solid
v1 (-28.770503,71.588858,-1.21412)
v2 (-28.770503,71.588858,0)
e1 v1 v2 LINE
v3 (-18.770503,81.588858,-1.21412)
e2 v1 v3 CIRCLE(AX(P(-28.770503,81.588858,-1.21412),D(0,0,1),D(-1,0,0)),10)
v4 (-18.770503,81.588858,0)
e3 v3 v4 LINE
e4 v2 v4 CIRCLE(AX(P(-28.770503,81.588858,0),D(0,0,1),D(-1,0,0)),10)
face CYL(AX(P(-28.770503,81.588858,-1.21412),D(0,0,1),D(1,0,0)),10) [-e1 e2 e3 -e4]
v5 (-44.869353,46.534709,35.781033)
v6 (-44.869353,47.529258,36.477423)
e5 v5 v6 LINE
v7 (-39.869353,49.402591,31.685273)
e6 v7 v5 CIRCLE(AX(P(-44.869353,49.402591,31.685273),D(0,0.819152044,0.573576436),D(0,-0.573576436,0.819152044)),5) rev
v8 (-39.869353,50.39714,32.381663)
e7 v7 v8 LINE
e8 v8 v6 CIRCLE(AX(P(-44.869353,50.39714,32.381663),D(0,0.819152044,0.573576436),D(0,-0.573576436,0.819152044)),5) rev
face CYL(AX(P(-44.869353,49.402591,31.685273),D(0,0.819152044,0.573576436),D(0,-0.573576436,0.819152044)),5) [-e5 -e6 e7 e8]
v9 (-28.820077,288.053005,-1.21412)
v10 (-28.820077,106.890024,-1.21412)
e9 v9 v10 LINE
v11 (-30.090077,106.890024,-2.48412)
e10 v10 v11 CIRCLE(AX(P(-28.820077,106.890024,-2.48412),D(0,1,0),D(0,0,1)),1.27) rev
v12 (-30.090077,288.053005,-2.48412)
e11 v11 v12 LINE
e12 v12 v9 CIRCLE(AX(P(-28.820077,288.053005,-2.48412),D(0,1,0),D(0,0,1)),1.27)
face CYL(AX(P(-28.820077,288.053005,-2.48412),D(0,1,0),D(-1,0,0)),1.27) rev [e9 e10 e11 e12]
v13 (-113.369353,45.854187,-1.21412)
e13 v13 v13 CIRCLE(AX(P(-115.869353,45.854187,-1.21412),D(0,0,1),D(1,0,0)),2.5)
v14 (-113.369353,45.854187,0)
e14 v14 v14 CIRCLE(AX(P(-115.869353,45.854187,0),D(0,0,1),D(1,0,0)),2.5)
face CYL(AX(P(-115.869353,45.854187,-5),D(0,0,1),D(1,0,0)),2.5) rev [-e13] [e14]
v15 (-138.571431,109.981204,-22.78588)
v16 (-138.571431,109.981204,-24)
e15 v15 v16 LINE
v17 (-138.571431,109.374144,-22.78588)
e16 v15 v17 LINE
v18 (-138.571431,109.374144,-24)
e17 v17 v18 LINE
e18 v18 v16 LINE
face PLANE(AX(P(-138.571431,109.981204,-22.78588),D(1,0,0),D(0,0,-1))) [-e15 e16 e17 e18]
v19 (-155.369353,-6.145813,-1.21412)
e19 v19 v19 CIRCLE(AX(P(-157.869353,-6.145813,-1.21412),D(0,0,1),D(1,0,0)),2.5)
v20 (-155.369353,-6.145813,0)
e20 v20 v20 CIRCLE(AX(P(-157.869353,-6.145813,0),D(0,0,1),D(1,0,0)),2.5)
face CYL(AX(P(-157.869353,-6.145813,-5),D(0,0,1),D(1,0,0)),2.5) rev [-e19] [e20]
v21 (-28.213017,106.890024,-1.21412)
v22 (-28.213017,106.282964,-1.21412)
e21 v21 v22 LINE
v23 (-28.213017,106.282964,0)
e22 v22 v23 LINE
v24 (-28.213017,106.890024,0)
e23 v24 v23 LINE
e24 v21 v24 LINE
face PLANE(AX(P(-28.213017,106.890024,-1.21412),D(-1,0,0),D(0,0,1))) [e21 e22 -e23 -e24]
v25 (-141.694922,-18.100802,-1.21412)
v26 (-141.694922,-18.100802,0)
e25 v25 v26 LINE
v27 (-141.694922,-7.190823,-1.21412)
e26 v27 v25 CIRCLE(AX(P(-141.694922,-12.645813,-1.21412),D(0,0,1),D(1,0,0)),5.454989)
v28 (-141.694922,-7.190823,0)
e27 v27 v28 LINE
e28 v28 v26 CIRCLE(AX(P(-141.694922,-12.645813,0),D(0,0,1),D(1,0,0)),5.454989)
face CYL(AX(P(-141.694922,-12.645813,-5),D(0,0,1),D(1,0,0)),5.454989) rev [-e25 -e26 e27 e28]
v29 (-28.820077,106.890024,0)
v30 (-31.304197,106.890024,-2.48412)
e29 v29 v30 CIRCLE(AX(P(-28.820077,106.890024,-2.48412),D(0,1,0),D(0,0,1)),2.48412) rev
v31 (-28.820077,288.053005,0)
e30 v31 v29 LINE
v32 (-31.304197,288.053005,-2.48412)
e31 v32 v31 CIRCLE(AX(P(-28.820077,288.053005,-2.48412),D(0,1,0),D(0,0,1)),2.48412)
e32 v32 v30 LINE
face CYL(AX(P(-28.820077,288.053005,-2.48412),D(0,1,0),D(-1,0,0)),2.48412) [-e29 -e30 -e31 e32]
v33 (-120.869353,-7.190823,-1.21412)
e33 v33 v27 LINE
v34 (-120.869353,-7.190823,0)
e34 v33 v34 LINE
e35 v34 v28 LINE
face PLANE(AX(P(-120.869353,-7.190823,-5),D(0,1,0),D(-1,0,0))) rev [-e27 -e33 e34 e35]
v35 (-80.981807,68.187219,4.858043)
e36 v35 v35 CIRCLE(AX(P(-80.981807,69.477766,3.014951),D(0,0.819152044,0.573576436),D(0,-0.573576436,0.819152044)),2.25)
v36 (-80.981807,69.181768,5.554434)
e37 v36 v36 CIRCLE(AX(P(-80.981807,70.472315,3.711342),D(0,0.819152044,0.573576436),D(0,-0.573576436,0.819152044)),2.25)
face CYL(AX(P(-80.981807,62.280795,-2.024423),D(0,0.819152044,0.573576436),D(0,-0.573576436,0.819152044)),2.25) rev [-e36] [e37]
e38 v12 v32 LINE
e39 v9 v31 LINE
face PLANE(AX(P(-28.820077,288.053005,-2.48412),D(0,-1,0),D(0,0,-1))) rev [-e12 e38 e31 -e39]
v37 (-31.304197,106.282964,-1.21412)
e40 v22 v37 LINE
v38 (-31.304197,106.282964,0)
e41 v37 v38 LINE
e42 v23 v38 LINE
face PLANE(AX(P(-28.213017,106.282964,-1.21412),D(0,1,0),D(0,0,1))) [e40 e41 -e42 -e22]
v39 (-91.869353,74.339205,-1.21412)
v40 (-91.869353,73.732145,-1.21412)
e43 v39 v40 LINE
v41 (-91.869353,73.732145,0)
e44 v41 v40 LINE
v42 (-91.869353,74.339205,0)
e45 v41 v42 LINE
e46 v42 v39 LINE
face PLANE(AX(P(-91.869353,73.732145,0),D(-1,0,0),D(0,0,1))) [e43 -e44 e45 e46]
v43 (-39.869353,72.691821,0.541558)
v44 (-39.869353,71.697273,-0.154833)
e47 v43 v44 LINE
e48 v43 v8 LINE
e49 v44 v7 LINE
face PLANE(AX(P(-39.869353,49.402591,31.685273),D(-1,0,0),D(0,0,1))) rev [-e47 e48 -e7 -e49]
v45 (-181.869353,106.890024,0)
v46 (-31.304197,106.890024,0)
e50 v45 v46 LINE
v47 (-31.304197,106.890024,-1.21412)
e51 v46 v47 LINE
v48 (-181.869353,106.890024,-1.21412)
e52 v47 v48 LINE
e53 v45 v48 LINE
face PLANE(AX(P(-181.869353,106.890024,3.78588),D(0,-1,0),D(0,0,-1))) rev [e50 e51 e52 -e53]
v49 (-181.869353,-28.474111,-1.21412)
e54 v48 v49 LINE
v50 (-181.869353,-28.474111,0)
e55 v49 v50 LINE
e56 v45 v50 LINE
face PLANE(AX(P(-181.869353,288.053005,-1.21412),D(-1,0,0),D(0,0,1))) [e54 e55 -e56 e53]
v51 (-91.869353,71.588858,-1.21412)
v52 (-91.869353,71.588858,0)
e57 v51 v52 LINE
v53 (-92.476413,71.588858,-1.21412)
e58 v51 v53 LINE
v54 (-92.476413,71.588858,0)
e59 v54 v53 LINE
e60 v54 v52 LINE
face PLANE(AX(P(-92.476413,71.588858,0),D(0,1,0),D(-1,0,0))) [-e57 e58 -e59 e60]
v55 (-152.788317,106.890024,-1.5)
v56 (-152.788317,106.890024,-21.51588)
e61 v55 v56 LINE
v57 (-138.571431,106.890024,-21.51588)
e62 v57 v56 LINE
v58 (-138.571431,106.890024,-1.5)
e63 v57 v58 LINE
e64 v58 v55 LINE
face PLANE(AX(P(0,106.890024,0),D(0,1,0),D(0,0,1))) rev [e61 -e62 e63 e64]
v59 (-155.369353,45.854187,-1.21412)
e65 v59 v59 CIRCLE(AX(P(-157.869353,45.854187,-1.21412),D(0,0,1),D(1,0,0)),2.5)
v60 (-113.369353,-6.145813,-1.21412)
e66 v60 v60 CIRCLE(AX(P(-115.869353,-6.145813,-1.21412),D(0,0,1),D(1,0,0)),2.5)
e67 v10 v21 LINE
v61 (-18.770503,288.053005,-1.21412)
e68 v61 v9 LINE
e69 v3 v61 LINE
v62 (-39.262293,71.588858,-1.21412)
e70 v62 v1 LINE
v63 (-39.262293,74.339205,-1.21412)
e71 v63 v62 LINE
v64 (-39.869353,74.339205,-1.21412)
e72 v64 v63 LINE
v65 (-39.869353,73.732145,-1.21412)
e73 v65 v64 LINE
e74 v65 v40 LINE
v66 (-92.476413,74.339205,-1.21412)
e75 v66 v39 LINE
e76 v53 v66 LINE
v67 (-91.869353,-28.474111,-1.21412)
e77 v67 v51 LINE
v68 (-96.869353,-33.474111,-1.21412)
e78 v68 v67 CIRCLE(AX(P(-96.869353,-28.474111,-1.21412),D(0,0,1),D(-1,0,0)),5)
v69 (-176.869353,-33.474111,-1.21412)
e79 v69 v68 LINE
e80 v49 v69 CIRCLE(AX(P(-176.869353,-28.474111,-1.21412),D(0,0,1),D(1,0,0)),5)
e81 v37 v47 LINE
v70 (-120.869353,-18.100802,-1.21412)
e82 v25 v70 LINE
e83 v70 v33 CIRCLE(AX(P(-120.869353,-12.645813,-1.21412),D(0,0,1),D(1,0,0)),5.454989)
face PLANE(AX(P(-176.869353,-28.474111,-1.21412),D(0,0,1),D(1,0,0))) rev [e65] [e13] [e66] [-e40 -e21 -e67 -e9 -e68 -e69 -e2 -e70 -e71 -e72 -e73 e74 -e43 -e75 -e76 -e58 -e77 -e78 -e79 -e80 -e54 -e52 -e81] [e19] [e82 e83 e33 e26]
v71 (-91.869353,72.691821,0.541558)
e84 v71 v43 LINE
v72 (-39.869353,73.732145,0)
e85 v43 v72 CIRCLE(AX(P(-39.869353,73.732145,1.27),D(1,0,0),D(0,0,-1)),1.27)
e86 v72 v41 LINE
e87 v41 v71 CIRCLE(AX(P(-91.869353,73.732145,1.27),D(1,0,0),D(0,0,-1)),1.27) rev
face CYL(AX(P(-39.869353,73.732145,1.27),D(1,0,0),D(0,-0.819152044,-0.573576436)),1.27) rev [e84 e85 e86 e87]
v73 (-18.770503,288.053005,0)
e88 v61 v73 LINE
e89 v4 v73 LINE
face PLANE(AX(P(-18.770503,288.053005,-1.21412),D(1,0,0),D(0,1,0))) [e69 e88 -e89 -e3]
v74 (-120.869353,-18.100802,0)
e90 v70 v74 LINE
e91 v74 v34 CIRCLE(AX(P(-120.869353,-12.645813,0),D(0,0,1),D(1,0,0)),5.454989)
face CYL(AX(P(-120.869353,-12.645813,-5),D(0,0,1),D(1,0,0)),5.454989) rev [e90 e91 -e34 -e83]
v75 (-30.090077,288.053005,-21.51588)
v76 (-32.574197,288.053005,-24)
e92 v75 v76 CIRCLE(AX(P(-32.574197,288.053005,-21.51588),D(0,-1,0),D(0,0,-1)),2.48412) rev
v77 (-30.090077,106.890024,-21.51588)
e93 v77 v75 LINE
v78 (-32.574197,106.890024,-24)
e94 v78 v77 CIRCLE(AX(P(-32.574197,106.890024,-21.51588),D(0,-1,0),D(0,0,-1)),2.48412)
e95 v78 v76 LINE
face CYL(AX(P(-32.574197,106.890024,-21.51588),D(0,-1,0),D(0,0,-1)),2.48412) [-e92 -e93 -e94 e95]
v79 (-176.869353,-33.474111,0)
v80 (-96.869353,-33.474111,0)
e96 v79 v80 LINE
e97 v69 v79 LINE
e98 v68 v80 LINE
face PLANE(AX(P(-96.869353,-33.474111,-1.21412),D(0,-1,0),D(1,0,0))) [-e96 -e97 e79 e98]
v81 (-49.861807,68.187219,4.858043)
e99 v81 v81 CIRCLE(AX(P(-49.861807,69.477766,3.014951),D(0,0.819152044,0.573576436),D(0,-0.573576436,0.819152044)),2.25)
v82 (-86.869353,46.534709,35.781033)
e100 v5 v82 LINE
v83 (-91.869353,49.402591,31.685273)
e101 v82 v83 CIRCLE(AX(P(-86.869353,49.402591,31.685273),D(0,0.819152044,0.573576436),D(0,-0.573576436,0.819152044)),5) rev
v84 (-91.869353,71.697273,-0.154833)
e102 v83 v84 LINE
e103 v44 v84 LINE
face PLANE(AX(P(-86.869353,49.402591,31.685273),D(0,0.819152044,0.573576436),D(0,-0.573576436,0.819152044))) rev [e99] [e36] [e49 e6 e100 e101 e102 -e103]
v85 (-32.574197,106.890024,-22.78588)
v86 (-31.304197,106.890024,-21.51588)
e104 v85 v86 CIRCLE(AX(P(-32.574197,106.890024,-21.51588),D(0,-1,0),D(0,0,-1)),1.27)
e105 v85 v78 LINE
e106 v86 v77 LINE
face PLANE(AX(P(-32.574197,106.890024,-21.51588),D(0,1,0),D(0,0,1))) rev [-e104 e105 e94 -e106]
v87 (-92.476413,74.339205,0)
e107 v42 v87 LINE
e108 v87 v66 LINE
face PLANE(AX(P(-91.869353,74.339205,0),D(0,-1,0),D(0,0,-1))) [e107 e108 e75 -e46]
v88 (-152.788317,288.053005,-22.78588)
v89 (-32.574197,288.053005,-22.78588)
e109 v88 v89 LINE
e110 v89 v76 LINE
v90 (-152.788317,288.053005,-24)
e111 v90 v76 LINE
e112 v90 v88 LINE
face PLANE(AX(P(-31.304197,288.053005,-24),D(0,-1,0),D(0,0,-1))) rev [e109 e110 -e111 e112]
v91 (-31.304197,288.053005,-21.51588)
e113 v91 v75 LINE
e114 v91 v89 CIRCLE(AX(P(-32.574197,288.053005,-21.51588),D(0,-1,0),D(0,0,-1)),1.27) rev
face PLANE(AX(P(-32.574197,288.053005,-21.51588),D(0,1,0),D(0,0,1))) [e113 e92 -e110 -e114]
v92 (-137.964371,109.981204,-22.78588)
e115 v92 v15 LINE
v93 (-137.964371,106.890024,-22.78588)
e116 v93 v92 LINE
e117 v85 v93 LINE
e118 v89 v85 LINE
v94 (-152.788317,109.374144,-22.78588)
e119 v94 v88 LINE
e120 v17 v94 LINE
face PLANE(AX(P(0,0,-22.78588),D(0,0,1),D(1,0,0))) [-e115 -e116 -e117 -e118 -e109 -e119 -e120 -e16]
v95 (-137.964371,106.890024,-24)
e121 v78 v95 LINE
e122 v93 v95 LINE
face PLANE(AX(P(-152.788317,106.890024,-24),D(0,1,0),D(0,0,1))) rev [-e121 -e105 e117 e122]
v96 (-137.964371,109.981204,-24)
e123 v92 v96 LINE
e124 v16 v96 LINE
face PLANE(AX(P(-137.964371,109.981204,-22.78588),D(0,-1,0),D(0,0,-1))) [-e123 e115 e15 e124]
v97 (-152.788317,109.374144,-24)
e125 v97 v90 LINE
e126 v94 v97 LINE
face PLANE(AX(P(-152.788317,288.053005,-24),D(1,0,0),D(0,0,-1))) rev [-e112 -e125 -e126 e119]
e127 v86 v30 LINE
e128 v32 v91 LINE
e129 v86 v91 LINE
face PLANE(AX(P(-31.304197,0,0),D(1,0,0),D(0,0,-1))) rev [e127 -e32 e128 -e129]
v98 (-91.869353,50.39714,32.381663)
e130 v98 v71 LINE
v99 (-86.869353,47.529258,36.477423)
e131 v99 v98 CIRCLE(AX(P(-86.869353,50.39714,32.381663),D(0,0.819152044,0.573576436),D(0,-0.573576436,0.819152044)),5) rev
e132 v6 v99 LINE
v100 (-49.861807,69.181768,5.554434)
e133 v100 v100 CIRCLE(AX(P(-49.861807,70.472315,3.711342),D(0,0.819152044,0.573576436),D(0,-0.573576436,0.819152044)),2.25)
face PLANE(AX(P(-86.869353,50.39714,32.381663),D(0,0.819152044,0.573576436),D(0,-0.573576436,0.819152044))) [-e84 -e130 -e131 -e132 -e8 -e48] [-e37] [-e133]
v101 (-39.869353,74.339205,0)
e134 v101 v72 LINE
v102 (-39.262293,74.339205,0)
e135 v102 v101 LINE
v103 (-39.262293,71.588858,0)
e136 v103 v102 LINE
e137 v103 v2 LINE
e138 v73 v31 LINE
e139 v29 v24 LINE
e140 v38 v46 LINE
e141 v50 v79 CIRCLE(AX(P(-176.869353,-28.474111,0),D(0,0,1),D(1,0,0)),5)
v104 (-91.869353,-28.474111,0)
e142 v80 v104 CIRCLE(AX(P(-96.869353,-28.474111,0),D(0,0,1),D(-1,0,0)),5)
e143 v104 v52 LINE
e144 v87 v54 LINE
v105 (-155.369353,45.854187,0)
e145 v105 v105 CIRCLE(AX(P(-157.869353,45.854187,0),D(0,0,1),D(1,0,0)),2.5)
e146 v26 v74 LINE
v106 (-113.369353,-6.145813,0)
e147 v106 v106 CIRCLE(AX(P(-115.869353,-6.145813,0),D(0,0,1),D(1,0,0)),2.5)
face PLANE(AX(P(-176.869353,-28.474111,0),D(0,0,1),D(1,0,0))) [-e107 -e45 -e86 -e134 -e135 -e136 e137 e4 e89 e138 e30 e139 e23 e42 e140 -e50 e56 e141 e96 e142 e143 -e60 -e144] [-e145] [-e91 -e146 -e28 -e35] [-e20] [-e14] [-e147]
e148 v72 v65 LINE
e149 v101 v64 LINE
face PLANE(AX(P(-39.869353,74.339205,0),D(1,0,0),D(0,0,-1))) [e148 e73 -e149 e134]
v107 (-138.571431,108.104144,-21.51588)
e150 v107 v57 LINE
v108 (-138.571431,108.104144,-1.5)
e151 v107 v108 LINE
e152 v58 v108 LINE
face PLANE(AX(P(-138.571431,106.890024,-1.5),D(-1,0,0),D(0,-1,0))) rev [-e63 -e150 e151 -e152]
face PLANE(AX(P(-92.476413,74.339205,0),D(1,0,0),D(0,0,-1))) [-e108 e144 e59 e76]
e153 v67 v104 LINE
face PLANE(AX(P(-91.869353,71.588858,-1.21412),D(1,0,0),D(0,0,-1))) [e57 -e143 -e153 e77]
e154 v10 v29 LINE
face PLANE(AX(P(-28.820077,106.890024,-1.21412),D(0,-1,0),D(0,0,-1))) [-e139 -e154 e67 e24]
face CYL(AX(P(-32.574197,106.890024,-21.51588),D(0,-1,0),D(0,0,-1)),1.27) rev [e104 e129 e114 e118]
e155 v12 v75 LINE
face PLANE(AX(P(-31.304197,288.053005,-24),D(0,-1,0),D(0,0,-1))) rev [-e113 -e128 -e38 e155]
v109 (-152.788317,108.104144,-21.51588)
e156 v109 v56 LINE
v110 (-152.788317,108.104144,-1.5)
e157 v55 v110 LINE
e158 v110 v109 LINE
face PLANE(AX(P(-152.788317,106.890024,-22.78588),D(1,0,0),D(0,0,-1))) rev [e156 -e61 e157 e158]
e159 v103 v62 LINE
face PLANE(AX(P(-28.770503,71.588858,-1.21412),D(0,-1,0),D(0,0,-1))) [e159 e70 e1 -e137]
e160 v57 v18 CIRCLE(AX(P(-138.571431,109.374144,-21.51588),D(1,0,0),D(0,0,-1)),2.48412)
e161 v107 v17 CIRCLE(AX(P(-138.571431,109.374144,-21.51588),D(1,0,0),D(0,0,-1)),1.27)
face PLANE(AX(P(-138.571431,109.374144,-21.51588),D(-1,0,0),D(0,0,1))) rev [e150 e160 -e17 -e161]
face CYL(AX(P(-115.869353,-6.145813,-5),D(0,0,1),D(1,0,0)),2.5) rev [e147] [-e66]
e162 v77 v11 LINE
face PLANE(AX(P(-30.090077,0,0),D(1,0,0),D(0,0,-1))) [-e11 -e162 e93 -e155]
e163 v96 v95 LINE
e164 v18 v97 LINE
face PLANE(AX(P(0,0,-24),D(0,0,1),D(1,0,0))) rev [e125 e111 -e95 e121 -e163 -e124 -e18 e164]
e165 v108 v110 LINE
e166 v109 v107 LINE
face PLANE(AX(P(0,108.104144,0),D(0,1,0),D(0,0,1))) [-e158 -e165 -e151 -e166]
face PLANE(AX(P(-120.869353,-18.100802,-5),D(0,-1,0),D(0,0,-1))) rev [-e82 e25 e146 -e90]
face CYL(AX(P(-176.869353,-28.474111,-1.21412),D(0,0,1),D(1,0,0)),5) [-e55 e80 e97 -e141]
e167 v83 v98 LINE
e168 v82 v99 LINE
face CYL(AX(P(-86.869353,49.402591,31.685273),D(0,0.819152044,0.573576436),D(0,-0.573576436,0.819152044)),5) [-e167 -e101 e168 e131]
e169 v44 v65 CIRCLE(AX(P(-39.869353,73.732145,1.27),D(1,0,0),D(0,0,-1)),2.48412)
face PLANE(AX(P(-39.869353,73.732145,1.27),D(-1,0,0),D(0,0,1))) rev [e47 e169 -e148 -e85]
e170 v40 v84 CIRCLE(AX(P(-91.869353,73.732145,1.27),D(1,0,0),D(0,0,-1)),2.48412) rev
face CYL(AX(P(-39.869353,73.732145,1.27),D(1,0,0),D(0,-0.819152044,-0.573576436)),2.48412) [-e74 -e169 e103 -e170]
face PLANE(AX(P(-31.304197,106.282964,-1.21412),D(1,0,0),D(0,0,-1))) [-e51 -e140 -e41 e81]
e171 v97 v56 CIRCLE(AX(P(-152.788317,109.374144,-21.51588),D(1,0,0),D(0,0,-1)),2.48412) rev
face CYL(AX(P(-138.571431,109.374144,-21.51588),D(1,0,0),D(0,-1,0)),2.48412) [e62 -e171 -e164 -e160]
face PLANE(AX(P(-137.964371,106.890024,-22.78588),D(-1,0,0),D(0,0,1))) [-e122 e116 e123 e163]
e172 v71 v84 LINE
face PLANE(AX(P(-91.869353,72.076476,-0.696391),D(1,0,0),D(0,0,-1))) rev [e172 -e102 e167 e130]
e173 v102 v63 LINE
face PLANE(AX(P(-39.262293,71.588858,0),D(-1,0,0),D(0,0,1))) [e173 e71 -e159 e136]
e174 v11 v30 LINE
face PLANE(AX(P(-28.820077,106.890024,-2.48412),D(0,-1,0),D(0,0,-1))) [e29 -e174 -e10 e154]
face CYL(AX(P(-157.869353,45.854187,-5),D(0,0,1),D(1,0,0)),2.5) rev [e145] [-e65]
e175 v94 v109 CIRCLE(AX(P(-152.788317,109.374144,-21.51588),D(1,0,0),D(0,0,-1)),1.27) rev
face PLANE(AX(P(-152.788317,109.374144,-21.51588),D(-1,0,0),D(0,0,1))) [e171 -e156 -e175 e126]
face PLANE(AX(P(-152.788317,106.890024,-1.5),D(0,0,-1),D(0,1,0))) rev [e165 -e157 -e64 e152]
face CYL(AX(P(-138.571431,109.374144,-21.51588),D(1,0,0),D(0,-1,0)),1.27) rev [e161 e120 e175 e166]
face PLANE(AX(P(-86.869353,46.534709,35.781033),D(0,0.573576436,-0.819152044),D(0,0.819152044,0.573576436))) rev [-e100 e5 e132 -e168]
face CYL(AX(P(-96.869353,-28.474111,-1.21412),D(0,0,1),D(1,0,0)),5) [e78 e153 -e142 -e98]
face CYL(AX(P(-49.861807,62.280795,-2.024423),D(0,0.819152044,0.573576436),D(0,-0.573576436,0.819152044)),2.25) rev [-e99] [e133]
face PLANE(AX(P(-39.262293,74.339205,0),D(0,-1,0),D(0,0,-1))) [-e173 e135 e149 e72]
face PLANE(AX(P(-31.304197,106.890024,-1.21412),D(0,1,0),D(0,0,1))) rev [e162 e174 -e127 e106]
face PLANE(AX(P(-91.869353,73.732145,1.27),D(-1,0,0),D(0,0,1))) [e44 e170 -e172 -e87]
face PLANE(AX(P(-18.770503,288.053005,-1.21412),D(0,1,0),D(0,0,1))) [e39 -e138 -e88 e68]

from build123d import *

# Parameters (mm, degrees)
BASE_FLANGE1_DEPTH            = 1.21412
SKETCH19_W                    = 150.565156201
SKETCH19_H                    = 181.162980563
CUT_EXTRUDE2_DEPTH            = 5
EDGE_FLANGE5_START            = 106.282964216
EDGE_FLANGE5_DEPTH            = 181.770040563
EDGE_FLANGE5_2_DEPTH          = 0.60706
EDGE_FLANGE5_START_2          = 106.890024216
EDGE_FLANGE5_3_DEPTH          = 181.162980563
EDGE_FLANGE6_STRIP_W          = 7.39648
EDGE_FLANGE6_STRIP_H          = 1.21412
EDGE_FLANGE6_STRIP_CUT_DEPTH  = 181.162980563
EDGE_FLANGE6_DEPTH            = 181.162980563
EDGE_FLANGE7_STRIP_W          = 7.39648
EDGE_FLANGE7_STRIP_H          = 1.21412
EDGE_FLANGE7_STRIP_CUT_DEPTH  = 14.216886025
EDGE_FLANGE7_RELIEF_W         = 8.00354
EDGE_FLANGE7_RELIEF_H         = 0.60706
EDGE_FLANGE7_RELIEF_CUT_DEPTH = 1.21412
EDGE_FLANGE7_DEPTH            = 14.216886025
SKETCH29_R                    = 2.5
CUT_EXTRUDE3_DEPTH            = 5
EDGE_FLANGE8_START            = -92.476413081
EDGE_FLANGE8_DEPTH            = 53.21412
EDGE_FLANGE8_2_DEPTH          = 0.60706
EDGE_FLANGE8_START_2          = -39.869353081
EDGE_FLANGE8_3_DEPTH          = 0.60706
EDGE_FLANGE8_START_3          = -91.869353081
EDGE_FLANGE8_4_DEPTH          = 52
EDGE_FLANGE8_START_4          = 58
EDGE_FLANGE8_5_DEPTH          = 2.895111402
SKETCH34_R                    = 2.25
CUT_EXTRUDE6_DEPTH            = 10


with BuildPart() as part:
    # Base-Flange1: sheet metal written as solids
    # Sketch1 → Base-Flange1 (new body)
    with BuildSketch(Plane.XY):
        with BuildLine():
            Line((-96.869353081, -33.474110531), (-176.869353081, -33.474110531))
            ThreePointArc((-176.869353081, -33.474110531), (-180.404886987, -32.009644437), (-181.869353081, -28.474110531))
            Line((-181.869353081, -28.474110531), (-181.869353081, 288.053004779))
            Line((-181.869353081, 288.053004779), (-18.770502539, 288.053004779))
            Line((-18.770502539, 288.053004779), (-18.770502539, 81.588857582))
            ThreePointArc((-18.770502539, 81.588857582), (-21.699434728, 74.51778977), (-28.770502539, 71.588857582))
            Line((-28.770502539, 71.588857582), (-91.869353081, 71.588857582))
            Line((-91.869353081, 71.588857582), (-91.869353081, -28.474110531))
            ThreePointArc((-91.869353081, -28.474110531), (-93.333819175, -32.009644437), (-96.869353081, -33.474110531))
        make_face()
    extrude(amount=-BASE_FLANGE1_DEPTH)

    # Sketch19 → Cut-Extrude2 (cut)
    with BuildSketch(Plane(origin=(0, 0, -1.21412), x_dir=(-1, 0, 0), z_dir=(0, 0, -1))):
        with Locations((106.586774981, 197.471514497)):
            Rectangle(SKETCH19_W, SKETCH19_H)
    extrude(amount=-CUT_EXTRUDE2_DEPTH, mode=Mode.SUBTRACT)

    # Edge-Flange5: read off the stored shape, not the designer's step
    # Edge-Flange5 outline → Edge-Flange5 (cut)
    with BuildSketch(Plane(origin=(0, 0, 0), x_dir=(1, 0, 0), z_dir=(0, 1, 0)).offset(EDGE_FLANGE5_START)):
        with BuildLine():
            Line((-31.30419688, 0), (-28.82007688, 0))
            ThreePointArc((-28.82007688, 0), (-30.04808742, 0.324758454), (-30.955012985, 1.21412))
            Line((-30.955012985, 1.21412), (-31.30419688, 1.21412))
            Line((-31.30419688, 1.21412), (-31.30419688, 0))
        make_face()
    extrude(amount=EDGE_FLANGE5_DEPTH, mode=Mode.SUBTRACT)

    # Edge-Flange5 2 outline → Edge-Flange5 2 (cut)
    with BuildSketch(Plane(origin=(0, 0, 0), x_dir=(1, 0, 0), z_dir=(0, 1, 0)).offset(EDGE_FLANGE5_START)):
        with BuildLine():
            Line((-28.21301688, 0), (-28.21301688, 1.21412))
            Line((-28.21301688, 1.21412), (-30.955012985, 1.21412))
            ThreePointArc((-30.955012985, 1.21412), (-30.04808742, 0.324758454), (-28.82007688, 0))
            Line((-28.82007688, 0), (-28.21301688, 0))
        make_face()
    extrude(amount=EDGE_FLANGE5_2_DEPTH, mode=Mode.SUBTRACT)

    # Edge-Flange5 3 outline → Edge-Flange5 3 (add)
    with BuildSketch(Plane(origin=(0, 0, 0), x_dir=(1, 0, 0), z_dir=(0, 1, 0)).offset(EDGE_FLANGE5_START_2)):
        with BuildLine():
            Line((-30.955012985, 1.21412), (-28.82007688, 1.21412))
            ThreePointArc((-28.82007688, 1.21412), (-29.718102492, 1.586094388), (-30.09007688, 2.48412))
            Line((-30.09007688, 2.48412), (-30.09007688, 24))
            Line((-30.09007688, 24), (-31.30419688, 24))
            Line((-31.30419688, 24), (-31.30419688, 2.48412))
            ThreePointArc((-31.30419688, 2.48412), (-31.215310653, 1.825555388), (-30.955012985, 1.21412))
        make_face()
    extrude(amount=EDGE_FLANGE5_3_DEPTH)

    # Edge-Flange6: sheet metal written as solids
    # Edge-Flange6 strip (on a plane across the edge) → Edge-Flange6 strip cut (cut)
    with BuildSketch(Plane(origin=(-31.30419688, 288.053004779, -24), x_dir=(0, 0, 1), z_dir=(0, -1, 0))):
        with Locations((-1.21412, -0.60706)):
            Rectangle(EDGE_FLANGE6_STRIP_W, EDGE_FLANGE6_STRIP_H)
    extrude(amount=EDGE_FLANGE6_STRIP_CUT_DEPTH, mode=Mode.SUBTRACT)

    # Edge-Flange6 section (on a plane across the edge) → Edge-Flange6 (add)
    with BuildSketch(Plane(origin=(-31.30419688, 288.053004779, -24), x_dir=(0, 0, 1), z_dir=(0, -1, 0))):
        with BuildLine():
            Line((0, 1.27), (0, 121.48412))
            Line((0, 121.48412), (1.21412, 121.48412))
            Line((1.21412, 121.48412), (1.21412, 1.27))
            ThreePointArc((1.21412, 1.27), (1.586094388, 0.371974388), (2.48412, 0))
            Line((2.48412, 0), (2.48412, -1.21412))
            ThreePointArc((2.48412, -1.21412), (0.727581903, -0.486538097), (0, 1.27))
        make_face()
    extrude(amount=EDGE_FLANGE6_DEPTH)

    # Edge-Flange7: sheet metal written as solids
    # Edge-Flange7 strip (on a plane across the edge) → Edge-Flange7 strip cut (cut)
    with BuildSketch(Plane(origin=(-152.78831688, 106.890024216, -22.78588), x_dir=(0, 1, 0), z_dir=(1, 0, 0))):
        with Locations((-1.21412, -0.60706)):
            Rectangle(EDGE_FLANGE7_STRIP_W, EDGE_FLANGE7_STRIP_H)
    extrude(amount=EDGE_FLANGE7_STRIP_CUT_DEPTH, mode=Mode.SUBTRACT)

    # Edge-Flange7 relief (on the sheet) → Edge-Flange7 relief cut (cut)
    with BuildSketch(Plane(origin=(-152.78831688, 109.374144216, -22.78588), x_dir=(0, 1, 0), z_dir=(0, 0, 1))):
        with Locations((-3.39471, -14.520416025)):
            Rectangle(EDGE_FLANGE7_RELIEF_W, EDGE_FLANGE7_RELIEF_H)
    extrude(amount=-EDGE_FLANGE7_RELIEF_CUT_DEPTH, mode=Mode.SUBTRACT)

    # Edge-Flange7 section (on a plane across the edge) → Edge-Flange7 (add)
    with BuildSketch(Plane(origin=(-152.78831688, 106.890024216, -22.78588), x_dir=(0, 1, 0), z_dir=(1, 0, 0))):
        with BuildLine():
            Line((0, 1.27), (0, 21.28588))
            Line((0, 21.28588), (1.21412, 21.28588))
            Line((1.21412, 21.28588), (1.21412, 1.27))
            ThreePointArc((1.21412, 1.27), (1.586094388, 0.371974388), (2.48412, 0))
            Line((2.48412, 0), (2.48412, -1.21412))
            ThreePointArc((2.48412, -1.21412), (0.727581903, -0.486538097), (0, 1.27))
        make_face()
    extrude(amount=EDGE_FLANGE7_DEPTH)

    # Sketch29 → Cut-Extrude3 (cut)
    with BuildSketch(Plane.XY):
        with Locations((-157.869353081, 45.8541873)):
            Circle(SKETCH29_R)
        with Locations((-115.869353081, 45.8541873)):
            Circle(SKETCH29_R)
        with Locations((-157.869353081, -6.1458127)):
            Circle(SKETCH29_R)
        with Locations((-115.869353081, -6.1458127)):
            Circle(SKETCH29_R)
        with BuildLine():
            Line((-120.869353081, -18.100802087), (-141.694922457, -18.100802087))
            ThreePointArc((-141.694922457, -18.100802087), (-147.149911844, -12.6458127), (-141.694922457, -7.190823313))
            Line((-141.694922457, -7.190823313), (-120.869353081, -7.190823313))
            ThreePointArc((-120.869353081, -7.190823313), (-115.414363694, -12.6458127), (-120.869353081, -18.100802087))
        make_face()
    extrude(amount=-CUT_EXTRUDE3_DEPTH, mode=Mode.SUBTRACT)

    # Edge-Flange8: read off the stored shape, not the designer's step
    # Edge-Flange8 outline → Edge-Flange8 (cut)
    with BuildSketch(Plane.YZ.offset(EDGE_FLANGE8_START)):
        with BuildLine():
            Line((71.588857582, -1.21412), (73.732144579, -1.21412))
            ThreePointArc((73.732144579, -1.21412), (72.585105614, -0.933441351), (71.697272603, -0.154832697))
            Line((71.697272603, -0.154832697), (71.588857582, 0))
            Line((71.588857582, 0), (71.588857582, -1.21412))
        make_face()
    extrude(amount=EDGE_FLANGE8_DEPTH, mode=Mode.SUBTRACT)

    # Edge-Flange8 2 outline → Edge-Flange8 2 (cut)
    with BuildSketch(Plane.YZ.offset(EDGE_FLANGE8_START)):
        with BuildLine():
            Line((74.339204579, -1.21412), (74.339204579, 0))
            Line((74.339204579, 0), (71.588857582, 0))
            Line((71.588857582, 0), (71.697272603, -0.154832697))
            ThreePointArc((71.697272603, -0.154832697), (72.585105614, -0.933441351), (73.732144579, -1.21412))
            Line((73.732144579, -1.21412), (74.339204579, -1.21412))
        make_face()
    extrude(amount=EDGE_FLANGE8_2_DEPTH, mode=Mode.SUBTRACT)

    # Edge-Flange8 3 outline → Edge-Flange8 3 (cut)
    with BuildSketch(Plane.YZ.offset(EDGE_FLANGE8_START_2)):
        with BuildLine():
            Line((74.339204579, -1.21412), (74.339204579, 0))
            Line((74.339204579, 0), (71.588857582, 0))
            Line((71.588857582, 0), (71.697272603, -0.154832697))
            ThreePointArc((71.697272603, -0.154832697), (72.585105614, -0.933441351), (73.732144579, -1.21412))
            Line((73.732144579, -1.21412), (74.339204579, -1.21412))
        make_face()
    extrude(amount=EDGE_FLANGE8_3_DEPTH, mode=Mode.SUBTRACT)

    # Edge-Flange8 4 outline → Edge-Flange8 4 (add)
    with BuildSketch(Plane.YZ.offset(EDGE_FLANGE8_START_3)):
        with BuildLine():
            Line((71.588857582, 0), (73.732144579, 0))
            ThreePointArc((73.732144579, 0), (73.14572384, 0.143496242), (72.691821483, 0.541557926))
            Line((72.691821483, 0.541557926), (47.529257546, 36.477423457))
            Line((47.529257546, 36.477423457), (46.534708666, 35.781032834))
            Line((46.534708666, 35.781032834), (71.588857582, 0))
        make_face()
    extrude(amount=EDGE_FLANGE8_4_DEPTH)

    # Edge-Flange8 5 outline → Edge-Flange8 5 (cut)
    with BuildSketch(Plane(origin=(0, 0, 0), x_dir=(1, 0, 0), z_dir=(0, 0.8191520442889886, 0.5735764363510508)).offset(EDGE_FLANGE8_START_4)):
        with BuildLine():
            ThreePointArc((-39.869353081, 2.381106171), (-41.333819175, -1.154427735), (-44.869353081, -2.618893829))
            Line((-44.869353081, -2.618893829), (-39.869353081, -2.61889383))
            Line((-39.869353081, -2.61889383), (-39.869353081, 2.381106171))
        make_face()
        with BuildLine():
            Line((-91.869353081, -2.61889383), (-86.869353081, -2.618893829))
            ThreePointArc((-86.869353081, -2.618893829), (-90.404886987, -1.154427735), (-91.869353081, 2.381106171))
            Line((-91.869353081, 2.381106171), (-91.869353081, -2.61889383))
        make_face()
    extrude(amount=EDGE_FLANGE8_5_DEPTH, mode=Mode.SUBTRACT)

    # Sketch34 → Cut-Extrude6 (cut)
    with BuildSketch(Plane(origin=(0, 49.031393336, 34.332151223), x_dir=(1, 0, 0), z_dir=(0, 0.8191520442889887, 0.5735764363510506))):
        with Locations(Location((-80.981806948, 37.381106171, 0), (0, 0, 270))):
            Circle(SKETCH34_R)
        with Locations(Location((-49.861806948, 37.381106171, 0), (0, 0, 270))):
            Circle(SKETCH34_R)
    extrude(amount=-CUT_EXTRUDE6_DEPTH, mode=Mode.SUBTRACT)


solid = part.part
